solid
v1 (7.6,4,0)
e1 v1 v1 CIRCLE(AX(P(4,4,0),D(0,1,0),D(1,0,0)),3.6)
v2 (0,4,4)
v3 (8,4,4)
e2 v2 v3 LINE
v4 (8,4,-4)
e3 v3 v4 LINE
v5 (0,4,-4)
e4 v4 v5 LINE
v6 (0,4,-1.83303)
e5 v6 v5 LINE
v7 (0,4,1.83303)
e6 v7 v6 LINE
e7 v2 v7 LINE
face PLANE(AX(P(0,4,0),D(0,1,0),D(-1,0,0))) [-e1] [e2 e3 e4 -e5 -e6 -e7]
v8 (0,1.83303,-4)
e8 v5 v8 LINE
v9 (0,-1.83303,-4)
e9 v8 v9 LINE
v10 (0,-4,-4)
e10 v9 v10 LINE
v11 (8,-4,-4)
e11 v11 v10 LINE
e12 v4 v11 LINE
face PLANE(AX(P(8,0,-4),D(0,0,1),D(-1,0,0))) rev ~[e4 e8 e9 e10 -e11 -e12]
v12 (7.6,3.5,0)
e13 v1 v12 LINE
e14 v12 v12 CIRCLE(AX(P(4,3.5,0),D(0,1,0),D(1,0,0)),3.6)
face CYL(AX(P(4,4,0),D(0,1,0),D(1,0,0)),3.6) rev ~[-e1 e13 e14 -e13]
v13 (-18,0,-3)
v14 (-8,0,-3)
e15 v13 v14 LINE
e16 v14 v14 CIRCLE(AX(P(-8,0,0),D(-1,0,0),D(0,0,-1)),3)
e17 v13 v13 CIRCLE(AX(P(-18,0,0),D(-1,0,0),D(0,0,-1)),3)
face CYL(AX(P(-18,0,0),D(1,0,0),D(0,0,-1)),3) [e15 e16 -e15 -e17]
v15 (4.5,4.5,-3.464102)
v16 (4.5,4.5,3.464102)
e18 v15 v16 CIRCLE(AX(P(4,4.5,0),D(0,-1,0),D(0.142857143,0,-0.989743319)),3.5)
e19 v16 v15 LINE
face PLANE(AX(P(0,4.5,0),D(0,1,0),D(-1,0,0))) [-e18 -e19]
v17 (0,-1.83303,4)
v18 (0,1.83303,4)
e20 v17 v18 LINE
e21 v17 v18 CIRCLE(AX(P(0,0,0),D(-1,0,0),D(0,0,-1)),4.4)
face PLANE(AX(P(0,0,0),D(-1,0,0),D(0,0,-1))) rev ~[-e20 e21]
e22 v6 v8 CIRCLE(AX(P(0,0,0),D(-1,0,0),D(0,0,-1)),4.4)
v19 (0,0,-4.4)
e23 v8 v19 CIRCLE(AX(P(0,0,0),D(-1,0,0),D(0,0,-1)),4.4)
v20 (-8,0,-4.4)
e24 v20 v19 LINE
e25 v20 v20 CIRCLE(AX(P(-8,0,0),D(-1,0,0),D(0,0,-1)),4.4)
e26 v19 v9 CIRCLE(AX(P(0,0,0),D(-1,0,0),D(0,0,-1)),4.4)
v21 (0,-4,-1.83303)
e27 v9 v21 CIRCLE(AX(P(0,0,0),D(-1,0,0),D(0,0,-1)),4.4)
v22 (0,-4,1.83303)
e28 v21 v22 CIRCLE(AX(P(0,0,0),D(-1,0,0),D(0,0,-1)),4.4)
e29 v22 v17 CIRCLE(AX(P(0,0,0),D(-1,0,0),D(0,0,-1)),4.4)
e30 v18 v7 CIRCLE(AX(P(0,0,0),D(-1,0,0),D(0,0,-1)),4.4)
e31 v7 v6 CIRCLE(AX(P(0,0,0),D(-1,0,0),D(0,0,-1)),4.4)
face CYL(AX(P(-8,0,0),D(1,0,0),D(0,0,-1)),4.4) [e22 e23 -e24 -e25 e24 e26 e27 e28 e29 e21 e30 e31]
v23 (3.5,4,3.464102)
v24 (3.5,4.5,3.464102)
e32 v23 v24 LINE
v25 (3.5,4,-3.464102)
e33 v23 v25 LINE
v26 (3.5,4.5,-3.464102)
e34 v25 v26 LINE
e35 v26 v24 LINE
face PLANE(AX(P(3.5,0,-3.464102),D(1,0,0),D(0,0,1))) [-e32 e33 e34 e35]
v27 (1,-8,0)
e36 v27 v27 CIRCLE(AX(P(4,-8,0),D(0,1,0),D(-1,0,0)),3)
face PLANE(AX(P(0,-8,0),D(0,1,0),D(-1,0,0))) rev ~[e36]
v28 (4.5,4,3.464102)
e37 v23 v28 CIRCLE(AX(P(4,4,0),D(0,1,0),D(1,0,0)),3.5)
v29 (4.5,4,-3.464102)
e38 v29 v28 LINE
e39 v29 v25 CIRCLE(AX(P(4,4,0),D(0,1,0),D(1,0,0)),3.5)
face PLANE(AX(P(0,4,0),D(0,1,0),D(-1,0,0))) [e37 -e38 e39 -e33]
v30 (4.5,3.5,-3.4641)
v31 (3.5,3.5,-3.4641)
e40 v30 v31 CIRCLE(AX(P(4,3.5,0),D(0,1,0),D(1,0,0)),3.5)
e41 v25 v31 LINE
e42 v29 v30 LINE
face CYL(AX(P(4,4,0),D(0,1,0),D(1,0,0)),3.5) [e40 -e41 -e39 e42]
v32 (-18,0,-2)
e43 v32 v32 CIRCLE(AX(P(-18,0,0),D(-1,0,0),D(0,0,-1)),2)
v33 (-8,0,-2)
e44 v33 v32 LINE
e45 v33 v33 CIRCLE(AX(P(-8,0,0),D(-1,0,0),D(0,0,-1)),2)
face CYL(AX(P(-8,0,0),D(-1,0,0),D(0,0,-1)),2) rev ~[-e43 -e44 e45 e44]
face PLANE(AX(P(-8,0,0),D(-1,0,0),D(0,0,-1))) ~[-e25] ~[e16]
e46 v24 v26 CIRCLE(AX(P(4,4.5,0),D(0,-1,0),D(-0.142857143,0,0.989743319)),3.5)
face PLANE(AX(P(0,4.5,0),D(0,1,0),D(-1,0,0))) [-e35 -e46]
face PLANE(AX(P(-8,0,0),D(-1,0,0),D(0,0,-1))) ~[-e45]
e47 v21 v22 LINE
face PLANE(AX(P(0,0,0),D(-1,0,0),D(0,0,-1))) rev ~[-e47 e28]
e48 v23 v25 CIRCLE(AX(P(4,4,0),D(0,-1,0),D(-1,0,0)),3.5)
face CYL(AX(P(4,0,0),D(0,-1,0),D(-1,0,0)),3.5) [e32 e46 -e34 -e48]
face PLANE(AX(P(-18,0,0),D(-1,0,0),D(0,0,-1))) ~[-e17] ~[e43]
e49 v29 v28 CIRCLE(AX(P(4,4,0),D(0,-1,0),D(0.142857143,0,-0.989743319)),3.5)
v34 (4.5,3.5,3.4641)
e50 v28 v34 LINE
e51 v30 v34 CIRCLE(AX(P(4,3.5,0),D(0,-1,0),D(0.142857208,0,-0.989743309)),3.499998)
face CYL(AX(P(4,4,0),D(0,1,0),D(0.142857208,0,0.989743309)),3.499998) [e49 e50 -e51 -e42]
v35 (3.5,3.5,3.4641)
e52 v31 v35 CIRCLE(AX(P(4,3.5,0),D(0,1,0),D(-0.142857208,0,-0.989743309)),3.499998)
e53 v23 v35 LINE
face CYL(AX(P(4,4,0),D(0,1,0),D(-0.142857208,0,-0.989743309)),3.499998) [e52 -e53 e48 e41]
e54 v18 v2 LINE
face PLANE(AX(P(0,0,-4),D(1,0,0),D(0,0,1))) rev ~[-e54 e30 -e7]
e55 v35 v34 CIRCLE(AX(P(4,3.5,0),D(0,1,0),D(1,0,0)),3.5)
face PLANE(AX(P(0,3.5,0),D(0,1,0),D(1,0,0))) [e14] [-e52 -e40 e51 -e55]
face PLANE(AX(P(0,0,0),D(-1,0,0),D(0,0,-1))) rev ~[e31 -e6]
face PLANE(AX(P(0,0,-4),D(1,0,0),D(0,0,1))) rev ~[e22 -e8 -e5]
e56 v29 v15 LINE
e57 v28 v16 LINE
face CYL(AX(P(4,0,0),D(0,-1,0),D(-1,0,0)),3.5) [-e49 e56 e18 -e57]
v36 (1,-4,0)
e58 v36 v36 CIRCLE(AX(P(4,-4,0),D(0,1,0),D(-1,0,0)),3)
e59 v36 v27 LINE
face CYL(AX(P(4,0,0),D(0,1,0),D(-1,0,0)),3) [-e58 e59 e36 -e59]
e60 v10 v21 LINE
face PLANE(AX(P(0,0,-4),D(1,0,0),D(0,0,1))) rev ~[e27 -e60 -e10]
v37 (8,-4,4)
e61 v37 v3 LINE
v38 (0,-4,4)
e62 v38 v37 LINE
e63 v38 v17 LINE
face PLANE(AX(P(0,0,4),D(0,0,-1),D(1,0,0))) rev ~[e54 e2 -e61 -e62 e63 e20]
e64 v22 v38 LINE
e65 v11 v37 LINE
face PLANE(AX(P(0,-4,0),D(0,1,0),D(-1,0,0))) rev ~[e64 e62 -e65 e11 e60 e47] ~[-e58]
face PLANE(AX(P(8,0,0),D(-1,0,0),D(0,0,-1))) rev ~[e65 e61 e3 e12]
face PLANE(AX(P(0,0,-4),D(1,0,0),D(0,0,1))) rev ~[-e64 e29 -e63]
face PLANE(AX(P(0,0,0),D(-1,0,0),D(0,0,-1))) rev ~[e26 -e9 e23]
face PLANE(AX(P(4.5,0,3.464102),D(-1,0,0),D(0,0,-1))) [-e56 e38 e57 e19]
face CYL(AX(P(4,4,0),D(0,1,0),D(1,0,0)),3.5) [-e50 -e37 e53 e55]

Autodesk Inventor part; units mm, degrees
ref_plane "YZ Plane" through (0, 0, 0) normal (1, 0, 0) x (0, 1, 0)
ref_plane "XZ Plane" through (0, 0, 0) normal (0, 1, 0) x (-1, 0, 0)
ref_plane "XY Plane" through (0, 0, 0) normal (0, 0, 1) x (1, 0, 0)
sketch "Sketch1" plane through (0, 0, 0) normal (0, 1, 0) x (-1, 0, 0)
  line L0 (0, 0) -> (8, 0)
  line L1 (8, 0) -> (8, -4.4)
  line L2 (8, -4.4) -> (0, -4.4)
  line L3 (0, -4.4) -> (0, 0)
  line L4 (0, 0) -> (-8, 0)
  line L5 (-8, 0) -> (-8, -4)
  line L6 (-8, -4) -> (0, -4)
  line L7 (0, -4) -> (0, 0)
  line L8 (-8, 0) -> (0, 0)
  line L9 (0, 0) -> (0, 4)
  line L10 (0, 4) -> (-8, 4)
  line L11 (-8, 4) -> (-8, 0)
  circle A0 centre (-4, 0) radius 3
  line L12 (8, -2) -> (18, -2)
  line L13 (18, -2) -> (18, -3)
  line L14 (18, -3) -> (8, -3)
  line L15 (8, -3) -> (8, -2)
  circle A1 centre (-4, 0) radius 3.5
  line L16 (-3.5, 3.6063) -> (-4.5, 3.6063)
  line L17 (-4.5, 3.6063) -> (-4.5, -3.6063)
  line L18 (-4.5, -3.6063) -> (-3.5, -3.6063)
  line L19 (-3.5, -3.6063) -> (-3.5, 3.6063)
  line L20 (-3.5, 3.6063) -> (-4.5, -3.6063) construction
  line L21 (-4.5, 3.6063) -> (-3.5, -3.6063) construction
  point P0 (-4.5, 3.4641)
  point P1 (-4.5, -3.4641)
  point P2 (-3.5, -3.4641)
  point P3 (-3.5, 3.4641)
  dimension "d0" = 8
  dimension "d1" = 4.4
  dimension "d2" = 8
  dimension "d3" = 4
  dimension "d4" = 4
  dimension "d5" = 6
  dimension "d6" = 10
  dimension "d7" = 1
  dimension "d8" = 2
  dimension "d9" = 7
  dimension "d10" = 1
revolve "Revolution1" add sketch "Sketch1" angle 360 about axis through (0, 0, 0) along (-1, 0, 0) contours L0 L1 L2 L3
revolve "Revolution2" add sketch "Sketch1" angle 360 about axis through (0, 0, 0) along (-1, 0, 0) contours L12 L13 L14 L1
extrude "Extrusion1" add sketch "Sketch1" along normal mid plane 8 contours L3 L6 L5 L4 A1 L17 L18 L19 | L4 A1 L19 L16 L17 L11 L10 L9 | A1 L19 A0 L4 | L4 A0 L19 A1 | A0 L19 L4 | L4 L19 A0 | L19 A0 L17 A1 | A1 L17 L16 L19 | L19 L18 L17 A1 | A1 L17 A0 L19 | L19 A0 L17 L4 | L4 L17 A0 L19 | L17 A0 L4 A1 | A1 L4 A0 L17 | L17 A0 L4 | L4 A0 L17
extrude "Extrusion2" add sketch "Sketch1" against normal blind 8 contours A0 L19 L4 | L4 L19 A0 | L19 A0 L17 L4 | L4 L17 A0 L19 | L17 A0 L4 | L4 A0 L17
extrude "Extrusion3" add sketch "Sketch1" along normal blind 4.5 contours A1 L19 A0 L4 | L4 A0 L19 A1 | A0 L19 L4 | L4 L19 A0 | L17 A0 L4 A1 | A1 L4 A0 L17 | L17 A0 L4 | L4 A0 L17
sketch "Sketch2" plane through (0, 4, 0) normal (0, 1, 0) x (1, 0, 0)
  arc A0 (3.5, 3.4641) -> (3.5, -3.4641) centre (4, 0) ccw projected
  line L0 (3.5, -3.4641) -> (3.5, 3.4641) projected
  arc A1 (4.5, -3.4641) -> (4.5, 3.4641) centre (4, 0) ccw projected
  line L1 (4.5, 3.4641) -> (4.5, -3.4641) projected
  line L2 (4.5, -3.4641) -> (4.5, 3.4641) projected
  arc A2 (4.5, -3.4641) -> (4.5, 3.4641) centre (4, 0) ccw projected
  line L3 (3.5, 3.4641) -> (3.5, -3.4641) projected
  arc A3 (3.5, 3.4641) -> (3.5, -3.4641) centre (4, 0) ccw projected
  line L4 (0, -4) -> (8, -4) projected
  line L5 (8, -4) -> (8, 4) projected
  line L6 (8, 4) -> (0, 4) projected
  line L7 (0, 4) -> (0, 1.833) projected
  line L8 (0, -1.833) -> (0, 1.833) projected
  line L9 (0, -1.833) -> (0, -4) projected
  circle A4 centre (4, 0) radius 3.6
  circle A5 centre (4, 0) radius 3.5
  point P0 (0, 0)
  point P1 (3.5, -3.4641)
  dimension "d19" = 7.2
extrude "Extrusion4" cut sketch "Sketch2" against normal blind 0.5 contours A4
thread "Thread1" size "M6x1" class "6g" standard "ISO Metric profile" length 3.5 offset 0.5
properties part number "6mm hose fitting"
